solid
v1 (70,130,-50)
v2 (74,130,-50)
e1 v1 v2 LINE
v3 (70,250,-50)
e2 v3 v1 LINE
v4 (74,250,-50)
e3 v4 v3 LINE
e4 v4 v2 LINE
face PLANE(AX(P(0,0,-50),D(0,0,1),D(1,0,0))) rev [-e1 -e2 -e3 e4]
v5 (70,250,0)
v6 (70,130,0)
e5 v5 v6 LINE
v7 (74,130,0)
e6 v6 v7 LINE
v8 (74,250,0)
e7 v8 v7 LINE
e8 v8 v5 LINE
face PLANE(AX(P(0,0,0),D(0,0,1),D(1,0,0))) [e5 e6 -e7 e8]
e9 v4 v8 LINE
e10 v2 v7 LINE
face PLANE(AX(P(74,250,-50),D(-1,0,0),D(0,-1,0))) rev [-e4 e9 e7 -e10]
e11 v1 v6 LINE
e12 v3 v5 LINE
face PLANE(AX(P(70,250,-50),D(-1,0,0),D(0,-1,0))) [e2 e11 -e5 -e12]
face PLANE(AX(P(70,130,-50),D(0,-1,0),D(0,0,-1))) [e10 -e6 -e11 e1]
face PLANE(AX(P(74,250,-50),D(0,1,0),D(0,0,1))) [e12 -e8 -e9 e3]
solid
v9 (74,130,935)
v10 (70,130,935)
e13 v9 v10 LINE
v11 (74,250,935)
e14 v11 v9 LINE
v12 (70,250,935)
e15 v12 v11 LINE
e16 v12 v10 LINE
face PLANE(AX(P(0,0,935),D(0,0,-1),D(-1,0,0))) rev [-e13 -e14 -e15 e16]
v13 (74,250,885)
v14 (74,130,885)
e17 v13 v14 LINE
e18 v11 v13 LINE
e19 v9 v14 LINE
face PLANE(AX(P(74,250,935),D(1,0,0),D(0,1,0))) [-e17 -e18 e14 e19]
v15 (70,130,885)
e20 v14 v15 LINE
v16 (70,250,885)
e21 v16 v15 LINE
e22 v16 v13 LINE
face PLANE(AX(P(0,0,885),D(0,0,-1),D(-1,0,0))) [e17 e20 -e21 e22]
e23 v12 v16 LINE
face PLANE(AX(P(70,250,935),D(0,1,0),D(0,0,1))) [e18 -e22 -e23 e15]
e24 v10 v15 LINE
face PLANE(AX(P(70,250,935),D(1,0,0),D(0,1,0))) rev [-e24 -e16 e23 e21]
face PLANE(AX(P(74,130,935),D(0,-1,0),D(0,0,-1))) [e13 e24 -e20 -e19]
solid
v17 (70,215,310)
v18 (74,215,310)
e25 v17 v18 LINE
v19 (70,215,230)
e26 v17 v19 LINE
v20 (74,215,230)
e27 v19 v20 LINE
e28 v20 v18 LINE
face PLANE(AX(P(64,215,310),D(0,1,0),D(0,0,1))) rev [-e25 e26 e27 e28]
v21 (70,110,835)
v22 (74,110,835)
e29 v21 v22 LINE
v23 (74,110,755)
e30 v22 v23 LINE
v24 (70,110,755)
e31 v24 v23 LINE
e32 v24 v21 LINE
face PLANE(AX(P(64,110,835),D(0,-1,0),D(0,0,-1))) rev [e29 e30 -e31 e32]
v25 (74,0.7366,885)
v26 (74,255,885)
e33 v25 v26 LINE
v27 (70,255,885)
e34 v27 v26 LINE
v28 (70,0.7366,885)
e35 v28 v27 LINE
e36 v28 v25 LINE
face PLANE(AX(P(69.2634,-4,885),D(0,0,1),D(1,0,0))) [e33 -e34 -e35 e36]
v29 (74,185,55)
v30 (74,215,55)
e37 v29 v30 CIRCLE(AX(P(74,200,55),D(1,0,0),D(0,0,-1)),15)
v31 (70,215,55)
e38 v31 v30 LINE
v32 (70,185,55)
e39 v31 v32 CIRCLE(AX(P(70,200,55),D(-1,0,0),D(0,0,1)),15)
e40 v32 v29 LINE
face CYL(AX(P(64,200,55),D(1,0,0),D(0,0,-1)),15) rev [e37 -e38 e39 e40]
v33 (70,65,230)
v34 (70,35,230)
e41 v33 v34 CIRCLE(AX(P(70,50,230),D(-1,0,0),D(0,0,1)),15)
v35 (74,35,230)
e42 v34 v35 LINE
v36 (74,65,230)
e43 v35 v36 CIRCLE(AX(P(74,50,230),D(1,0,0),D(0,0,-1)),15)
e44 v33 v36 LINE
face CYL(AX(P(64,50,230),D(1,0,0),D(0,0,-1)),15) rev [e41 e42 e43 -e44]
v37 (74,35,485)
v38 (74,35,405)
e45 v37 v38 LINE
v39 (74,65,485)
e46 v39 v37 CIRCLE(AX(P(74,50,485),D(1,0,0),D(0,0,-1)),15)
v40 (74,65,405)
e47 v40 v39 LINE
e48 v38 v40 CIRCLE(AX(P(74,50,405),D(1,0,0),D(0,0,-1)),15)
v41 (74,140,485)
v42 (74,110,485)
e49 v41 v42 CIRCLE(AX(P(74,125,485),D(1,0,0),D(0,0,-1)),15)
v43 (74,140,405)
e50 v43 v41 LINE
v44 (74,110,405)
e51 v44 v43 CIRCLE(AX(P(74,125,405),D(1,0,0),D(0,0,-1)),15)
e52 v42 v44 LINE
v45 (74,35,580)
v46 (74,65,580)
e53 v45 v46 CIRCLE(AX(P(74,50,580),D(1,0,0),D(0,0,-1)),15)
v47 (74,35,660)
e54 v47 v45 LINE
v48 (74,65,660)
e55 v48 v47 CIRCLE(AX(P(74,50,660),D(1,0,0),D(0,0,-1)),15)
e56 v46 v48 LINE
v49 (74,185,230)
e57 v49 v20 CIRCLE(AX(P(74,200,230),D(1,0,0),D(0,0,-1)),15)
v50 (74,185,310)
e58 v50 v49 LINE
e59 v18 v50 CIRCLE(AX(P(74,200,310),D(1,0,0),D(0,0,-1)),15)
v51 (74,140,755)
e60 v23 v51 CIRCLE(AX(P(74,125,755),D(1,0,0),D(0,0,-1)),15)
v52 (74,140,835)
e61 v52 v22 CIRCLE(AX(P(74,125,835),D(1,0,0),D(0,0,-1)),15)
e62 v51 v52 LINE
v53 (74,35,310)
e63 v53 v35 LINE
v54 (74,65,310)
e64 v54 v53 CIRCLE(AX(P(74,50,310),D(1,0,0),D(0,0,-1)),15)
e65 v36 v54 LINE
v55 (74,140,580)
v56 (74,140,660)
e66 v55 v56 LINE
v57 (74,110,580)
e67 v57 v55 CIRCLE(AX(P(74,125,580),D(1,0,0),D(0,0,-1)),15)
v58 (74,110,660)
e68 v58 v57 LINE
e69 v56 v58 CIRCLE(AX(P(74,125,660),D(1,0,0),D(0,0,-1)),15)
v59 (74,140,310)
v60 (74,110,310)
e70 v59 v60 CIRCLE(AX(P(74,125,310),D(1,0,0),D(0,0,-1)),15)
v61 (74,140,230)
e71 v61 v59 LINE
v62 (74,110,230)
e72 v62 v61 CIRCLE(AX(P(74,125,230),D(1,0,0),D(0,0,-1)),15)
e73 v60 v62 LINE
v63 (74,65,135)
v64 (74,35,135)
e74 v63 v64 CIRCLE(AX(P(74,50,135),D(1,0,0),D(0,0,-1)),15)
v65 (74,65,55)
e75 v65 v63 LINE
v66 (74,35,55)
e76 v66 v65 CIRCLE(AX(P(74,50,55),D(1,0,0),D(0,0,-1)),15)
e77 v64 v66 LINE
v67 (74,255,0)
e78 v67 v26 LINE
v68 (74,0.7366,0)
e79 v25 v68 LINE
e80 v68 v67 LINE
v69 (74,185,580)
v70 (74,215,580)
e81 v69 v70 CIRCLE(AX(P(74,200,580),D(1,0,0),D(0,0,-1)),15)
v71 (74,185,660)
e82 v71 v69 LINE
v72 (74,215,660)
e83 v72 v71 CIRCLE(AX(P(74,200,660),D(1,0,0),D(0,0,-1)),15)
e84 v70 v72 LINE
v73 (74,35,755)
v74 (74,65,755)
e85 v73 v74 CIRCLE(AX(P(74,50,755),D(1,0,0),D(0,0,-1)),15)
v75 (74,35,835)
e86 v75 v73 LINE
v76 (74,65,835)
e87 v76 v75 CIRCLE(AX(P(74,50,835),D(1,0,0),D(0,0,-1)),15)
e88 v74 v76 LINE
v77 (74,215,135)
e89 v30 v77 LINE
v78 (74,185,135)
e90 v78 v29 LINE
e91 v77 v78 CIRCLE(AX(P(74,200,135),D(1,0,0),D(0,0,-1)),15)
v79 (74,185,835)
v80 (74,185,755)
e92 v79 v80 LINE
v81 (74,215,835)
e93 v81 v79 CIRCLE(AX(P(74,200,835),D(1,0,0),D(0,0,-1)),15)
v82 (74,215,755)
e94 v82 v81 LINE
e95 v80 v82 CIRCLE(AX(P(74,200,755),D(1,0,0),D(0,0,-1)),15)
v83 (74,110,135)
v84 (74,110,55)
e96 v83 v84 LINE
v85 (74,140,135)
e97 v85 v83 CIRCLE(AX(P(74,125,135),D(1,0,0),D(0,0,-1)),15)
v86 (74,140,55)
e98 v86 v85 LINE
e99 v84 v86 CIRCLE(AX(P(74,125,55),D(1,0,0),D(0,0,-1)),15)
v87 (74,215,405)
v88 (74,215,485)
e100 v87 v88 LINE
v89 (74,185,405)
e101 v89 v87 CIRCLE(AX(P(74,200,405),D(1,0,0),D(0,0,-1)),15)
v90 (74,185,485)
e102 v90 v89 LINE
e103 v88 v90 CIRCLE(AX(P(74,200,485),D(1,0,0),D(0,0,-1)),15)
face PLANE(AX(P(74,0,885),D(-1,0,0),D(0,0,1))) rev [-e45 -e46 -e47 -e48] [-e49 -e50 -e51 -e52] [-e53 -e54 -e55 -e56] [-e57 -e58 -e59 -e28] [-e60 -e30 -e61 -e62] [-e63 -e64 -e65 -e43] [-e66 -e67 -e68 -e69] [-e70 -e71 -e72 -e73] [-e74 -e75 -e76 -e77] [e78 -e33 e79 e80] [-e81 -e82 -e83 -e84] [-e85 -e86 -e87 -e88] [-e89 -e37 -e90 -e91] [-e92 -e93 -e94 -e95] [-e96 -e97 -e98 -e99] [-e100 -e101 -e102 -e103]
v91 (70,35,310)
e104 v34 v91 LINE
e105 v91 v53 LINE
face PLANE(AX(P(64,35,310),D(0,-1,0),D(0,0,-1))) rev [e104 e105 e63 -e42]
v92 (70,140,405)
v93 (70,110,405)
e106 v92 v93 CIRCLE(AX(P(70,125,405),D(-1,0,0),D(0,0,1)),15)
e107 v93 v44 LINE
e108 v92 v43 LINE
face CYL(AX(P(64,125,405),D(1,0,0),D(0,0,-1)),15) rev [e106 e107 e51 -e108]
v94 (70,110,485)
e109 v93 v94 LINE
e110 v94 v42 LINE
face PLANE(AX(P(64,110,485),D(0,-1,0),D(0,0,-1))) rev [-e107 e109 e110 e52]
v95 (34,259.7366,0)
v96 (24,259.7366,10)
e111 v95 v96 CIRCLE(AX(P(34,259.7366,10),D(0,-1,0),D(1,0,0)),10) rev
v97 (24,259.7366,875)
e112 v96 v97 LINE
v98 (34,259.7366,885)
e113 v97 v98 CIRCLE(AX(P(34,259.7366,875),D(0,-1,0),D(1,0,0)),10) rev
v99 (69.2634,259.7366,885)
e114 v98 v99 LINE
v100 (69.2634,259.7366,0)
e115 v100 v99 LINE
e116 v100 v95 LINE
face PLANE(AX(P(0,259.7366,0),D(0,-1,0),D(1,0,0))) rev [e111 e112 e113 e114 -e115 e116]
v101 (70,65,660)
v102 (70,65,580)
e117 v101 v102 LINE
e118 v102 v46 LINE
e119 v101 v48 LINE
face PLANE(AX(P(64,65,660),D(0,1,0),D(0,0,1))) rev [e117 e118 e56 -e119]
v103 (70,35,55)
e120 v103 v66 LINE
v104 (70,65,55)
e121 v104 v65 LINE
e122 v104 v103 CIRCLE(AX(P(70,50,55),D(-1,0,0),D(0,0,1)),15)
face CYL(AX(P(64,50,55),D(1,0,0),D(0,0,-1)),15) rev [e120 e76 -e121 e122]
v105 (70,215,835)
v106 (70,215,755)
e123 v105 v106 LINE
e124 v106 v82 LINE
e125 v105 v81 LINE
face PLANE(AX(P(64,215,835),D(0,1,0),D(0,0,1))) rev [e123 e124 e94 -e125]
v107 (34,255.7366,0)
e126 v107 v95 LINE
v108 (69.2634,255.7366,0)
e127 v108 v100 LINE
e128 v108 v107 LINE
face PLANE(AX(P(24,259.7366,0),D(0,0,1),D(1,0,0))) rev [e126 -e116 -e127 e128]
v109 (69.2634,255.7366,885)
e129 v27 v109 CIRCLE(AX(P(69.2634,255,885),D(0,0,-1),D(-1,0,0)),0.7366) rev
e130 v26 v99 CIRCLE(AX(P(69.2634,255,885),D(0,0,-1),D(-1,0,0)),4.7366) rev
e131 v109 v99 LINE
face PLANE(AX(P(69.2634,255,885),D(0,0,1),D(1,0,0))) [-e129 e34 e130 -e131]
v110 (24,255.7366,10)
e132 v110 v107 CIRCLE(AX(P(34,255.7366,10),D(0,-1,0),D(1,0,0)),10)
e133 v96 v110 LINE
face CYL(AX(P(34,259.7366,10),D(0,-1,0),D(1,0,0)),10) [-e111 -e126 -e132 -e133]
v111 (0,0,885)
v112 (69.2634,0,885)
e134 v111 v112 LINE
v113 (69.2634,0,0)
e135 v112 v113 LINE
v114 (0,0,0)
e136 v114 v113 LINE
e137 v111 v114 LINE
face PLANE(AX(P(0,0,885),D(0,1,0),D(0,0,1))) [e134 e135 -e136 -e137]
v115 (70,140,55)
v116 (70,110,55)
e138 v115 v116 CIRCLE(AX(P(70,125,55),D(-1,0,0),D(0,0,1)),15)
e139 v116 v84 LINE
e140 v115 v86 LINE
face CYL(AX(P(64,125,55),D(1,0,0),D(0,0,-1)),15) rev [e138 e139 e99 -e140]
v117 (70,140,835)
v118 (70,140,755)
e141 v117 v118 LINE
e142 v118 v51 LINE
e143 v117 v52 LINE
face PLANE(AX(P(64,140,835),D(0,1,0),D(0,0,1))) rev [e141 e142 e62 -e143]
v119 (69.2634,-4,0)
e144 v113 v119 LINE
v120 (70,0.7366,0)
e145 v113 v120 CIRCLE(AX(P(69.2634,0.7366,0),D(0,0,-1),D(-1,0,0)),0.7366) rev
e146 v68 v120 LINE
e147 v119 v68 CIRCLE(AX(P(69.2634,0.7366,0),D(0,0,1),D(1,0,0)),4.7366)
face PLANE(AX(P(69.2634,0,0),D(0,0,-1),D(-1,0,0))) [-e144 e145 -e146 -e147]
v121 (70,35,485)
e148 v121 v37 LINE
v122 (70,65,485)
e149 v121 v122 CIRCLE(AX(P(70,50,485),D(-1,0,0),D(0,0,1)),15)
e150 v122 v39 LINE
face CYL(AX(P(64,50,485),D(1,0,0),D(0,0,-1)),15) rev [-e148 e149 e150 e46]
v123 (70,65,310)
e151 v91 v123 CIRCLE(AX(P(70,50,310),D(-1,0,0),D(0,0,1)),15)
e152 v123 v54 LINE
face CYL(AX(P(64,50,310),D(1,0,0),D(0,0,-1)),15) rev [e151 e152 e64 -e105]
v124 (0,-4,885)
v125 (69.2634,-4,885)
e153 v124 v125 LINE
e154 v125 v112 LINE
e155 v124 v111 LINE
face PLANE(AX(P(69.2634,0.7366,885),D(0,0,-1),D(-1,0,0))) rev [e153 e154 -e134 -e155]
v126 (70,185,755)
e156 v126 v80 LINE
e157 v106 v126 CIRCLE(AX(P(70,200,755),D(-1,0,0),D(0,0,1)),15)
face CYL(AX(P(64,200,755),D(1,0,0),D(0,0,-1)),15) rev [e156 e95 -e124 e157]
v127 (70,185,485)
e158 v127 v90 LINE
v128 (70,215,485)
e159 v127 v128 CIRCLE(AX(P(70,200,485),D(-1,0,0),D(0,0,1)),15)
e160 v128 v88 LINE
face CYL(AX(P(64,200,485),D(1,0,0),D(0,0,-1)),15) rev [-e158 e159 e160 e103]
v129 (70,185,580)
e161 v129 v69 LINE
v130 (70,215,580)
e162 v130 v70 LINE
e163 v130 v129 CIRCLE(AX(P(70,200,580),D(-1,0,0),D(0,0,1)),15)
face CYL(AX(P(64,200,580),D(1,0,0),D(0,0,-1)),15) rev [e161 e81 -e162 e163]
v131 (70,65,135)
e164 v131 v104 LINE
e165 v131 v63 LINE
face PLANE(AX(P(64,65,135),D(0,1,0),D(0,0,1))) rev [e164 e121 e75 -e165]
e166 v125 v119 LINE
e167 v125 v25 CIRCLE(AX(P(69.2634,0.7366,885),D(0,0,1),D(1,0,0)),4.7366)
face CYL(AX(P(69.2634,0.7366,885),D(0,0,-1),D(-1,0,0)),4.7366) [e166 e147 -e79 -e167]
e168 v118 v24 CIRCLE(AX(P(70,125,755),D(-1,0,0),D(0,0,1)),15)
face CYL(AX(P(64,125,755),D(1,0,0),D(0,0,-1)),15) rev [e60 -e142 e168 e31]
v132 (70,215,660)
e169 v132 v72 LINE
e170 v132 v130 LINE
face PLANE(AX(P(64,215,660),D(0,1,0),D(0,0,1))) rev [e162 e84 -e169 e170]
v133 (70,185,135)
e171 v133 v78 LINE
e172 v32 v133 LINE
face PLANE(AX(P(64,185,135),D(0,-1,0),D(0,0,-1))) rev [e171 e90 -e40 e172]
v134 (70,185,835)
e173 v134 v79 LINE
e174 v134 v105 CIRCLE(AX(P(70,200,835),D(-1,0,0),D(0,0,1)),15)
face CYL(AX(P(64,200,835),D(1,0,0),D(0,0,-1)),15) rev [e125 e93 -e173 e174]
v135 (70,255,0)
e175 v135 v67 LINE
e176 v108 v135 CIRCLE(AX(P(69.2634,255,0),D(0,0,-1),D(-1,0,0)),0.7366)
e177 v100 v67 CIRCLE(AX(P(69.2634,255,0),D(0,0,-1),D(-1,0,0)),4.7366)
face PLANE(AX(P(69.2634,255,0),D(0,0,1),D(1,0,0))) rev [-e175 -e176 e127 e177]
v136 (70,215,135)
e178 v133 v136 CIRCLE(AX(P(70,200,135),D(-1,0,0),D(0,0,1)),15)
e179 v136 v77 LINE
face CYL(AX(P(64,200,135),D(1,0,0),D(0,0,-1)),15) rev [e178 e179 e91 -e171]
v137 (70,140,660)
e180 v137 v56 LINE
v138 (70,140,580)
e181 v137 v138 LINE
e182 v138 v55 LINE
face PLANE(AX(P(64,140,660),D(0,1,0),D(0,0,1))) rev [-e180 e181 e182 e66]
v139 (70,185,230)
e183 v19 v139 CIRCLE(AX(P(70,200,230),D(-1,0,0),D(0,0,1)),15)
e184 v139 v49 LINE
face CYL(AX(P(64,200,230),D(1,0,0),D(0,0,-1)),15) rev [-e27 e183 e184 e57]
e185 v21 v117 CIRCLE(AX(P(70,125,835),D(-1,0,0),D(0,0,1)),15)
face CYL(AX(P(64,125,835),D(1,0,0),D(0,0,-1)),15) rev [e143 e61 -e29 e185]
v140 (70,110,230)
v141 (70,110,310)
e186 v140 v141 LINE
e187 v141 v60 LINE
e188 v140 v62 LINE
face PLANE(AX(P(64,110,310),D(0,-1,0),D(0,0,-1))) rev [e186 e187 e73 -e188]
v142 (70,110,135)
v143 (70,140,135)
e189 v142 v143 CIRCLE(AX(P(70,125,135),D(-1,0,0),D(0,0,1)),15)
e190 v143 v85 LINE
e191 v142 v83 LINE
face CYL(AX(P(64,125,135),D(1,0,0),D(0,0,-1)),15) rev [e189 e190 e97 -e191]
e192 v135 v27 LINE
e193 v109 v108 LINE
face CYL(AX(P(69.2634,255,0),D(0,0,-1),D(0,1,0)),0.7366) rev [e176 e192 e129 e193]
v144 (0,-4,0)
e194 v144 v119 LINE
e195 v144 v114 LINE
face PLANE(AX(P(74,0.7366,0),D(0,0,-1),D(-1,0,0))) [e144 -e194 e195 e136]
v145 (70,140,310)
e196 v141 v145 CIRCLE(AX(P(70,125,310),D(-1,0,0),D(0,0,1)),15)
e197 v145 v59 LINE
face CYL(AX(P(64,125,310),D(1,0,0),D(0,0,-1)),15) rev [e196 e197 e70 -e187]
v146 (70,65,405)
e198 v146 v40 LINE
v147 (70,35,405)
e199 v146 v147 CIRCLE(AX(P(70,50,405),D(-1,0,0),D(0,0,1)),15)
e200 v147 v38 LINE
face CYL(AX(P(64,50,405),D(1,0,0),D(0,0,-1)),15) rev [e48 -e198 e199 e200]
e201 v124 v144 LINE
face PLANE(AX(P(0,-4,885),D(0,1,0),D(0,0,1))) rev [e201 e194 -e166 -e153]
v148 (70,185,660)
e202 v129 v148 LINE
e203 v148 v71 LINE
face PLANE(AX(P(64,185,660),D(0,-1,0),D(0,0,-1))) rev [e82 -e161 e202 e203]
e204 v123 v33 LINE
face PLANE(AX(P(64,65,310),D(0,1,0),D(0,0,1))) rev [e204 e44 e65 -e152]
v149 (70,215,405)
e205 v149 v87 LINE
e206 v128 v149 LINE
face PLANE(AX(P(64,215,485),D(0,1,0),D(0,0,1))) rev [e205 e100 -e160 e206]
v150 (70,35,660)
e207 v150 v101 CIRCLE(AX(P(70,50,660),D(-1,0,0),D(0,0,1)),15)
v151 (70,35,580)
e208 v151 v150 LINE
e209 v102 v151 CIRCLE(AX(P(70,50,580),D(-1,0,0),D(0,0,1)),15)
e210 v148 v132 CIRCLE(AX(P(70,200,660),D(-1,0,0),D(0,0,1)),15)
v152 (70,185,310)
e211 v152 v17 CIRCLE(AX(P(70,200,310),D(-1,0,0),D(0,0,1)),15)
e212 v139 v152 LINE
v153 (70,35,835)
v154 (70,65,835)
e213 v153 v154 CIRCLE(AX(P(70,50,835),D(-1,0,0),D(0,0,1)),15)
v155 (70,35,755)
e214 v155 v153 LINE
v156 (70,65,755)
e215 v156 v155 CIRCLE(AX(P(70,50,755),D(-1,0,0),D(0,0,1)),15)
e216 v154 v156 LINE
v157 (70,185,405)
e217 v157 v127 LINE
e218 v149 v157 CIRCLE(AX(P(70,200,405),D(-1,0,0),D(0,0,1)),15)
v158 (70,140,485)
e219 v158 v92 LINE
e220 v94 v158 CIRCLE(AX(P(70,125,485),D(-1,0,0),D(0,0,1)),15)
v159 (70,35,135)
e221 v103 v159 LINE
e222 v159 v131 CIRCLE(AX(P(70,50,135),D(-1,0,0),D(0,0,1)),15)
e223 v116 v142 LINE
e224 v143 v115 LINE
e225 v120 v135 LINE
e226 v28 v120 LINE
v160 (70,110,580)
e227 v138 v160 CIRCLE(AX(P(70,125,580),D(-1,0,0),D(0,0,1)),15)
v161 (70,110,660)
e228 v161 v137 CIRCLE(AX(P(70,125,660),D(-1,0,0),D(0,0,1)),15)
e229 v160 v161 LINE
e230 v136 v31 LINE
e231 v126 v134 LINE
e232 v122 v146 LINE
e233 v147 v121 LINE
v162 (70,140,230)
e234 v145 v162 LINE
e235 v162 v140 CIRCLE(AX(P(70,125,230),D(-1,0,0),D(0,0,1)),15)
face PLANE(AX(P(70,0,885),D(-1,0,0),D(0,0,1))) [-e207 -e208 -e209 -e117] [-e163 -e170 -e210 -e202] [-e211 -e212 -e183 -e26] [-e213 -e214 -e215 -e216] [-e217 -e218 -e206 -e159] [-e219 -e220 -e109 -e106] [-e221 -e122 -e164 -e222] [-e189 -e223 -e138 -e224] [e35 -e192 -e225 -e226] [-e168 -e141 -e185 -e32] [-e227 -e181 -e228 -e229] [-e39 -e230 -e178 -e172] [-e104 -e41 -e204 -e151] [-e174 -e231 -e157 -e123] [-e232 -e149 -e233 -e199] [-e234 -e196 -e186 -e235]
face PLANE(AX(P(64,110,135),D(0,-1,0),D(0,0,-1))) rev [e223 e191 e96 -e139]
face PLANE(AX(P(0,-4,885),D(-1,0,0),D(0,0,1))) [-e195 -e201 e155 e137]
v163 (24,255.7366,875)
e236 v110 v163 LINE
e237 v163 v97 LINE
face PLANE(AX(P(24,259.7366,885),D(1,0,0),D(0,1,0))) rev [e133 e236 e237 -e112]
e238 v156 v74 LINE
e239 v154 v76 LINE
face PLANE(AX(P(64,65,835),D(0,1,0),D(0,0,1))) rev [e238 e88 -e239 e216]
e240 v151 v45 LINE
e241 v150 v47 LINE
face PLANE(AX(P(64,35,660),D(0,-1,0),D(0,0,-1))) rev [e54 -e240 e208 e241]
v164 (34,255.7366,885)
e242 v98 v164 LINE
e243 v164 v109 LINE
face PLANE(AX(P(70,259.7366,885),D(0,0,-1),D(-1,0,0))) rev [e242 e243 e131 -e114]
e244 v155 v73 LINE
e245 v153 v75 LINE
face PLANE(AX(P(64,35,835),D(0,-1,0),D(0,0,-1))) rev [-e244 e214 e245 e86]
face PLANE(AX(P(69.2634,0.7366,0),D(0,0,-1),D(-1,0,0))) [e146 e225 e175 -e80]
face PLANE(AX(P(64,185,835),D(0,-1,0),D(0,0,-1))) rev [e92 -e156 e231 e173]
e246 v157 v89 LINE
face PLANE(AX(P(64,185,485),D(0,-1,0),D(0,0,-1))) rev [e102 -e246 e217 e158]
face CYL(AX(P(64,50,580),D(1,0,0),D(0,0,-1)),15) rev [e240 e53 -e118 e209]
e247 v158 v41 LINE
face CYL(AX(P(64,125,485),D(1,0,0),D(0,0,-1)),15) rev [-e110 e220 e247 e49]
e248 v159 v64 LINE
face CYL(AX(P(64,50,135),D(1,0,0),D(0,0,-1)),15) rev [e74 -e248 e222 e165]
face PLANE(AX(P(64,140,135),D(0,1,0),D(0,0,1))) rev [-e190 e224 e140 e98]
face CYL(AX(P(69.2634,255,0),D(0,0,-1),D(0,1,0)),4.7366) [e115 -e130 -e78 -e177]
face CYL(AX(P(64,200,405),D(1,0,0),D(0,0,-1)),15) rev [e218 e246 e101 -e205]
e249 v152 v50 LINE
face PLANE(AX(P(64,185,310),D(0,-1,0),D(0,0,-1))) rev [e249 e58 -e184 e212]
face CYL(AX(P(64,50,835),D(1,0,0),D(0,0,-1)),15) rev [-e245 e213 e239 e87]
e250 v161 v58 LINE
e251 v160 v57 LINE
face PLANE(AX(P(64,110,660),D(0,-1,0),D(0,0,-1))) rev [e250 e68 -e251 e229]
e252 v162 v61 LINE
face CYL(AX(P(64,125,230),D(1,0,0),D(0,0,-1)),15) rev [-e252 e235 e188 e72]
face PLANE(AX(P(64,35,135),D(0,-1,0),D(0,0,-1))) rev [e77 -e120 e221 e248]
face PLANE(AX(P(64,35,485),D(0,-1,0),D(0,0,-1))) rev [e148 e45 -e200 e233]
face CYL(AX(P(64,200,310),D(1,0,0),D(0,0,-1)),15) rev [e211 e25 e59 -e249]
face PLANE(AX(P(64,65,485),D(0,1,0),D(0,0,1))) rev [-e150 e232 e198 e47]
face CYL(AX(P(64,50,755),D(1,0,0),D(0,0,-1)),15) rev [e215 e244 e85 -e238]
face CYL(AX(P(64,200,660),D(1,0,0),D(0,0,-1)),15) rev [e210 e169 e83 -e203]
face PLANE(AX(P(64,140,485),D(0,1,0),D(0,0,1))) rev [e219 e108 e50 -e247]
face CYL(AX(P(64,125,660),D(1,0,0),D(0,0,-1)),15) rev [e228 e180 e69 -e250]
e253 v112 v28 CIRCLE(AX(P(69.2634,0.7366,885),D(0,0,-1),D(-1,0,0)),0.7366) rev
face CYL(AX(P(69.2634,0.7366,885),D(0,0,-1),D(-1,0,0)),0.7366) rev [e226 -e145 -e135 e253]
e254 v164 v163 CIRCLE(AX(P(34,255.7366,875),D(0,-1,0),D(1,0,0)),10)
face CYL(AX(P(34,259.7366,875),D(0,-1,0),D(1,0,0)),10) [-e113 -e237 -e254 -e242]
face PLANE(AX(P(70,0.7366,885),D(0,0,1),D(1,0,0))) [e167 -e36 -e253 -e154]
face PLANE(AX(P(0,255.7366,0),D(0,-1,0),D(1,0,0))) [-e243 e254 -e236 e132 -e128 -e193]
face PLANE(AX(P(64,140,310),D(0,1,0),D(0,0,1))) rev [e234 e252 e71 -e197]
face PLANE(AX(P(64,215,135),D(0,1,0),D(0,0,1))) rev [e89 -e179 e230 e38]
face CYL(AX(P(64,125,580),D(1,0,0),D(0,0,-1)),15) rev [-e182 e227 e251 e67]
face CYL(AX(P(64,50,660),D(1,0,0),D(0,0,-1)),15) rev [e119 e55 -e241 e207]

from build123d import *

# Parameters (mm, degrees)
TABAN_FLAN_1_DEPTH    = 885
KES_EKSTR_ZYON1_DEPTH = 10
L_O_ALTMA1_COUNT      = 5
L_O_ALTMA1_PITCH      = 175
L_O_ALTMA1_COUNT_DIR2 = 3
L_O_ALTMA1_PITCH_DIR2 = 75
IZIM7_W               = 4
IZIM7_H               = 120
TABAN_FLAN_2_DEPTH    = 50
IZIM10_W              = 4
IZIM10_H              = 120
TABAN_FLAN_3_DEPTH    = 50
KENAR_FLAN_1_DEPTH    = 885
RADYUS2_R             = 10


# Sheet-metal steps are written as plain solids
with BuildPart() as part:
    # Çizim1 → Taban-Flanş1 (new body)
    with BuildSketch(Plane.XY):
        with BuildLine():
            Line((0, 0), (69.2634, 0))
            ThreePointArc((69.2634, 0), (69.784254855, 0.215745145), (70, 0.7366))
            Line((70, 0.7366), (70, 250))
            Line((70, 250), (74, 250))
            Line((74, 250), (74, 0.7366))
            ThreePointArc((74, 0.7366), (72.61268198, -2.61268198), (69.2634, -4))
            Line((69.2634, -4), (0, -4))
            Line((0, -4), (0, 0))
        make_face()
    extrude(amount=TABAN_FLAN_1_DEPTH)

    # Çizim6 → Kes-Ekstrüzyon1 (cut)
    with BuildSketch(Plane(origin=(74, 0, 0), x_dir=(0, 0, -1), z_dir=(1, 0, 0))):
        with BuildLine():
            Line((-835, 215), (-755, 215))
            ThreePointArc((-755, 215), (-740, 200), (-755, 185))
            Line((-755, 185), (-835, 185))
            ThreePointArc((-835, 185), (-850, 200), (-835, 215))
        make_face()
    kes_ekstr_zyon1 = extrude(amount=-KES_EKSTR_ZYON1_DEPTH, mode=Mode.SUBTRACT)

    # LÇoğaltma1: Kes-Ekstr_zyon1 5 × 3
    with Locations(*[(0, -j * L_O_ALTMA1_PITCH_DIR2, -i * L_O_ALTMA1_PITCH) for i in range(L_O_ALTMA1_COUNT) for j in range(L_O_ALTMA1_COUNT_DIR2) if (i, j) != (0, 0)]):
        add(kes_ekstr_zyon1, mode=Mode.SUBTRACT)

    # Kenar-Flanş1 section (across the edge) → Kenar-Flanş1 (add)
    with BuildSketch(Plane(origin=(70, 255.7366, 885), x_dir=(0, -1, 0), z_dir=(0, 0, -1))):
        with BuildLine():
            Line((-4, 0.7366), (-4, 46))
            Line((-4, 46), (0, 46))
            Line((0, 46), (0, 0.7366))
            ThreePointArc((0, 0.7366), (0.215745145, 0.215745145), (0.7366, 0))
            Line((0.7366, 0), (5.7366, 0))
            Line((5.7366, 0), (5.7366, -4))
            Line((5.7366, -4), (0.7366, -4))
            ThreePointArc((0.7366, -4), (-2.61268198, -2.61268198), (-4, 0.7366))
        make_face()
    extrude(amount=KENAR_FLAN_1_DEPTH)

    # Radyus2
    radyus2_edges = [part.edges().sort_by_distance(p)[0] for p in [
        (24, 257.7366, 885),
        (24, 257.7366, 0),
    ]]
    fillet(radyus2_edges, radius=RADYUS2_R)


with BuildPart() as body_2:
    # Çizim7 → Taban-Flanş2 (new body)
    with BuildSketch(Plane.XY.offset(885)):
        with Locations((72, 190)):
            Rectangle(IZIM7_W, IZIM7_H)
    extrude(amount=TABAN_FLAN_2_DEPTH)


with BuildPart() as body_3:
    # Çizim10 → Taban-Flanş3 (new body)
    with BuildSketch(Plane(origin=(0, 0, 0), x_dir=(-1, 0, 0), z_dir=(0, 0, -1))):
        with Locations((-72, 190)):
            Rectangle(IZIM10_W, IZIM10_H)
    extrude(amount=TABAN_FLAN_3_DEPTH)


solid = Compound([part.part, body_2.part, body_3.part])
